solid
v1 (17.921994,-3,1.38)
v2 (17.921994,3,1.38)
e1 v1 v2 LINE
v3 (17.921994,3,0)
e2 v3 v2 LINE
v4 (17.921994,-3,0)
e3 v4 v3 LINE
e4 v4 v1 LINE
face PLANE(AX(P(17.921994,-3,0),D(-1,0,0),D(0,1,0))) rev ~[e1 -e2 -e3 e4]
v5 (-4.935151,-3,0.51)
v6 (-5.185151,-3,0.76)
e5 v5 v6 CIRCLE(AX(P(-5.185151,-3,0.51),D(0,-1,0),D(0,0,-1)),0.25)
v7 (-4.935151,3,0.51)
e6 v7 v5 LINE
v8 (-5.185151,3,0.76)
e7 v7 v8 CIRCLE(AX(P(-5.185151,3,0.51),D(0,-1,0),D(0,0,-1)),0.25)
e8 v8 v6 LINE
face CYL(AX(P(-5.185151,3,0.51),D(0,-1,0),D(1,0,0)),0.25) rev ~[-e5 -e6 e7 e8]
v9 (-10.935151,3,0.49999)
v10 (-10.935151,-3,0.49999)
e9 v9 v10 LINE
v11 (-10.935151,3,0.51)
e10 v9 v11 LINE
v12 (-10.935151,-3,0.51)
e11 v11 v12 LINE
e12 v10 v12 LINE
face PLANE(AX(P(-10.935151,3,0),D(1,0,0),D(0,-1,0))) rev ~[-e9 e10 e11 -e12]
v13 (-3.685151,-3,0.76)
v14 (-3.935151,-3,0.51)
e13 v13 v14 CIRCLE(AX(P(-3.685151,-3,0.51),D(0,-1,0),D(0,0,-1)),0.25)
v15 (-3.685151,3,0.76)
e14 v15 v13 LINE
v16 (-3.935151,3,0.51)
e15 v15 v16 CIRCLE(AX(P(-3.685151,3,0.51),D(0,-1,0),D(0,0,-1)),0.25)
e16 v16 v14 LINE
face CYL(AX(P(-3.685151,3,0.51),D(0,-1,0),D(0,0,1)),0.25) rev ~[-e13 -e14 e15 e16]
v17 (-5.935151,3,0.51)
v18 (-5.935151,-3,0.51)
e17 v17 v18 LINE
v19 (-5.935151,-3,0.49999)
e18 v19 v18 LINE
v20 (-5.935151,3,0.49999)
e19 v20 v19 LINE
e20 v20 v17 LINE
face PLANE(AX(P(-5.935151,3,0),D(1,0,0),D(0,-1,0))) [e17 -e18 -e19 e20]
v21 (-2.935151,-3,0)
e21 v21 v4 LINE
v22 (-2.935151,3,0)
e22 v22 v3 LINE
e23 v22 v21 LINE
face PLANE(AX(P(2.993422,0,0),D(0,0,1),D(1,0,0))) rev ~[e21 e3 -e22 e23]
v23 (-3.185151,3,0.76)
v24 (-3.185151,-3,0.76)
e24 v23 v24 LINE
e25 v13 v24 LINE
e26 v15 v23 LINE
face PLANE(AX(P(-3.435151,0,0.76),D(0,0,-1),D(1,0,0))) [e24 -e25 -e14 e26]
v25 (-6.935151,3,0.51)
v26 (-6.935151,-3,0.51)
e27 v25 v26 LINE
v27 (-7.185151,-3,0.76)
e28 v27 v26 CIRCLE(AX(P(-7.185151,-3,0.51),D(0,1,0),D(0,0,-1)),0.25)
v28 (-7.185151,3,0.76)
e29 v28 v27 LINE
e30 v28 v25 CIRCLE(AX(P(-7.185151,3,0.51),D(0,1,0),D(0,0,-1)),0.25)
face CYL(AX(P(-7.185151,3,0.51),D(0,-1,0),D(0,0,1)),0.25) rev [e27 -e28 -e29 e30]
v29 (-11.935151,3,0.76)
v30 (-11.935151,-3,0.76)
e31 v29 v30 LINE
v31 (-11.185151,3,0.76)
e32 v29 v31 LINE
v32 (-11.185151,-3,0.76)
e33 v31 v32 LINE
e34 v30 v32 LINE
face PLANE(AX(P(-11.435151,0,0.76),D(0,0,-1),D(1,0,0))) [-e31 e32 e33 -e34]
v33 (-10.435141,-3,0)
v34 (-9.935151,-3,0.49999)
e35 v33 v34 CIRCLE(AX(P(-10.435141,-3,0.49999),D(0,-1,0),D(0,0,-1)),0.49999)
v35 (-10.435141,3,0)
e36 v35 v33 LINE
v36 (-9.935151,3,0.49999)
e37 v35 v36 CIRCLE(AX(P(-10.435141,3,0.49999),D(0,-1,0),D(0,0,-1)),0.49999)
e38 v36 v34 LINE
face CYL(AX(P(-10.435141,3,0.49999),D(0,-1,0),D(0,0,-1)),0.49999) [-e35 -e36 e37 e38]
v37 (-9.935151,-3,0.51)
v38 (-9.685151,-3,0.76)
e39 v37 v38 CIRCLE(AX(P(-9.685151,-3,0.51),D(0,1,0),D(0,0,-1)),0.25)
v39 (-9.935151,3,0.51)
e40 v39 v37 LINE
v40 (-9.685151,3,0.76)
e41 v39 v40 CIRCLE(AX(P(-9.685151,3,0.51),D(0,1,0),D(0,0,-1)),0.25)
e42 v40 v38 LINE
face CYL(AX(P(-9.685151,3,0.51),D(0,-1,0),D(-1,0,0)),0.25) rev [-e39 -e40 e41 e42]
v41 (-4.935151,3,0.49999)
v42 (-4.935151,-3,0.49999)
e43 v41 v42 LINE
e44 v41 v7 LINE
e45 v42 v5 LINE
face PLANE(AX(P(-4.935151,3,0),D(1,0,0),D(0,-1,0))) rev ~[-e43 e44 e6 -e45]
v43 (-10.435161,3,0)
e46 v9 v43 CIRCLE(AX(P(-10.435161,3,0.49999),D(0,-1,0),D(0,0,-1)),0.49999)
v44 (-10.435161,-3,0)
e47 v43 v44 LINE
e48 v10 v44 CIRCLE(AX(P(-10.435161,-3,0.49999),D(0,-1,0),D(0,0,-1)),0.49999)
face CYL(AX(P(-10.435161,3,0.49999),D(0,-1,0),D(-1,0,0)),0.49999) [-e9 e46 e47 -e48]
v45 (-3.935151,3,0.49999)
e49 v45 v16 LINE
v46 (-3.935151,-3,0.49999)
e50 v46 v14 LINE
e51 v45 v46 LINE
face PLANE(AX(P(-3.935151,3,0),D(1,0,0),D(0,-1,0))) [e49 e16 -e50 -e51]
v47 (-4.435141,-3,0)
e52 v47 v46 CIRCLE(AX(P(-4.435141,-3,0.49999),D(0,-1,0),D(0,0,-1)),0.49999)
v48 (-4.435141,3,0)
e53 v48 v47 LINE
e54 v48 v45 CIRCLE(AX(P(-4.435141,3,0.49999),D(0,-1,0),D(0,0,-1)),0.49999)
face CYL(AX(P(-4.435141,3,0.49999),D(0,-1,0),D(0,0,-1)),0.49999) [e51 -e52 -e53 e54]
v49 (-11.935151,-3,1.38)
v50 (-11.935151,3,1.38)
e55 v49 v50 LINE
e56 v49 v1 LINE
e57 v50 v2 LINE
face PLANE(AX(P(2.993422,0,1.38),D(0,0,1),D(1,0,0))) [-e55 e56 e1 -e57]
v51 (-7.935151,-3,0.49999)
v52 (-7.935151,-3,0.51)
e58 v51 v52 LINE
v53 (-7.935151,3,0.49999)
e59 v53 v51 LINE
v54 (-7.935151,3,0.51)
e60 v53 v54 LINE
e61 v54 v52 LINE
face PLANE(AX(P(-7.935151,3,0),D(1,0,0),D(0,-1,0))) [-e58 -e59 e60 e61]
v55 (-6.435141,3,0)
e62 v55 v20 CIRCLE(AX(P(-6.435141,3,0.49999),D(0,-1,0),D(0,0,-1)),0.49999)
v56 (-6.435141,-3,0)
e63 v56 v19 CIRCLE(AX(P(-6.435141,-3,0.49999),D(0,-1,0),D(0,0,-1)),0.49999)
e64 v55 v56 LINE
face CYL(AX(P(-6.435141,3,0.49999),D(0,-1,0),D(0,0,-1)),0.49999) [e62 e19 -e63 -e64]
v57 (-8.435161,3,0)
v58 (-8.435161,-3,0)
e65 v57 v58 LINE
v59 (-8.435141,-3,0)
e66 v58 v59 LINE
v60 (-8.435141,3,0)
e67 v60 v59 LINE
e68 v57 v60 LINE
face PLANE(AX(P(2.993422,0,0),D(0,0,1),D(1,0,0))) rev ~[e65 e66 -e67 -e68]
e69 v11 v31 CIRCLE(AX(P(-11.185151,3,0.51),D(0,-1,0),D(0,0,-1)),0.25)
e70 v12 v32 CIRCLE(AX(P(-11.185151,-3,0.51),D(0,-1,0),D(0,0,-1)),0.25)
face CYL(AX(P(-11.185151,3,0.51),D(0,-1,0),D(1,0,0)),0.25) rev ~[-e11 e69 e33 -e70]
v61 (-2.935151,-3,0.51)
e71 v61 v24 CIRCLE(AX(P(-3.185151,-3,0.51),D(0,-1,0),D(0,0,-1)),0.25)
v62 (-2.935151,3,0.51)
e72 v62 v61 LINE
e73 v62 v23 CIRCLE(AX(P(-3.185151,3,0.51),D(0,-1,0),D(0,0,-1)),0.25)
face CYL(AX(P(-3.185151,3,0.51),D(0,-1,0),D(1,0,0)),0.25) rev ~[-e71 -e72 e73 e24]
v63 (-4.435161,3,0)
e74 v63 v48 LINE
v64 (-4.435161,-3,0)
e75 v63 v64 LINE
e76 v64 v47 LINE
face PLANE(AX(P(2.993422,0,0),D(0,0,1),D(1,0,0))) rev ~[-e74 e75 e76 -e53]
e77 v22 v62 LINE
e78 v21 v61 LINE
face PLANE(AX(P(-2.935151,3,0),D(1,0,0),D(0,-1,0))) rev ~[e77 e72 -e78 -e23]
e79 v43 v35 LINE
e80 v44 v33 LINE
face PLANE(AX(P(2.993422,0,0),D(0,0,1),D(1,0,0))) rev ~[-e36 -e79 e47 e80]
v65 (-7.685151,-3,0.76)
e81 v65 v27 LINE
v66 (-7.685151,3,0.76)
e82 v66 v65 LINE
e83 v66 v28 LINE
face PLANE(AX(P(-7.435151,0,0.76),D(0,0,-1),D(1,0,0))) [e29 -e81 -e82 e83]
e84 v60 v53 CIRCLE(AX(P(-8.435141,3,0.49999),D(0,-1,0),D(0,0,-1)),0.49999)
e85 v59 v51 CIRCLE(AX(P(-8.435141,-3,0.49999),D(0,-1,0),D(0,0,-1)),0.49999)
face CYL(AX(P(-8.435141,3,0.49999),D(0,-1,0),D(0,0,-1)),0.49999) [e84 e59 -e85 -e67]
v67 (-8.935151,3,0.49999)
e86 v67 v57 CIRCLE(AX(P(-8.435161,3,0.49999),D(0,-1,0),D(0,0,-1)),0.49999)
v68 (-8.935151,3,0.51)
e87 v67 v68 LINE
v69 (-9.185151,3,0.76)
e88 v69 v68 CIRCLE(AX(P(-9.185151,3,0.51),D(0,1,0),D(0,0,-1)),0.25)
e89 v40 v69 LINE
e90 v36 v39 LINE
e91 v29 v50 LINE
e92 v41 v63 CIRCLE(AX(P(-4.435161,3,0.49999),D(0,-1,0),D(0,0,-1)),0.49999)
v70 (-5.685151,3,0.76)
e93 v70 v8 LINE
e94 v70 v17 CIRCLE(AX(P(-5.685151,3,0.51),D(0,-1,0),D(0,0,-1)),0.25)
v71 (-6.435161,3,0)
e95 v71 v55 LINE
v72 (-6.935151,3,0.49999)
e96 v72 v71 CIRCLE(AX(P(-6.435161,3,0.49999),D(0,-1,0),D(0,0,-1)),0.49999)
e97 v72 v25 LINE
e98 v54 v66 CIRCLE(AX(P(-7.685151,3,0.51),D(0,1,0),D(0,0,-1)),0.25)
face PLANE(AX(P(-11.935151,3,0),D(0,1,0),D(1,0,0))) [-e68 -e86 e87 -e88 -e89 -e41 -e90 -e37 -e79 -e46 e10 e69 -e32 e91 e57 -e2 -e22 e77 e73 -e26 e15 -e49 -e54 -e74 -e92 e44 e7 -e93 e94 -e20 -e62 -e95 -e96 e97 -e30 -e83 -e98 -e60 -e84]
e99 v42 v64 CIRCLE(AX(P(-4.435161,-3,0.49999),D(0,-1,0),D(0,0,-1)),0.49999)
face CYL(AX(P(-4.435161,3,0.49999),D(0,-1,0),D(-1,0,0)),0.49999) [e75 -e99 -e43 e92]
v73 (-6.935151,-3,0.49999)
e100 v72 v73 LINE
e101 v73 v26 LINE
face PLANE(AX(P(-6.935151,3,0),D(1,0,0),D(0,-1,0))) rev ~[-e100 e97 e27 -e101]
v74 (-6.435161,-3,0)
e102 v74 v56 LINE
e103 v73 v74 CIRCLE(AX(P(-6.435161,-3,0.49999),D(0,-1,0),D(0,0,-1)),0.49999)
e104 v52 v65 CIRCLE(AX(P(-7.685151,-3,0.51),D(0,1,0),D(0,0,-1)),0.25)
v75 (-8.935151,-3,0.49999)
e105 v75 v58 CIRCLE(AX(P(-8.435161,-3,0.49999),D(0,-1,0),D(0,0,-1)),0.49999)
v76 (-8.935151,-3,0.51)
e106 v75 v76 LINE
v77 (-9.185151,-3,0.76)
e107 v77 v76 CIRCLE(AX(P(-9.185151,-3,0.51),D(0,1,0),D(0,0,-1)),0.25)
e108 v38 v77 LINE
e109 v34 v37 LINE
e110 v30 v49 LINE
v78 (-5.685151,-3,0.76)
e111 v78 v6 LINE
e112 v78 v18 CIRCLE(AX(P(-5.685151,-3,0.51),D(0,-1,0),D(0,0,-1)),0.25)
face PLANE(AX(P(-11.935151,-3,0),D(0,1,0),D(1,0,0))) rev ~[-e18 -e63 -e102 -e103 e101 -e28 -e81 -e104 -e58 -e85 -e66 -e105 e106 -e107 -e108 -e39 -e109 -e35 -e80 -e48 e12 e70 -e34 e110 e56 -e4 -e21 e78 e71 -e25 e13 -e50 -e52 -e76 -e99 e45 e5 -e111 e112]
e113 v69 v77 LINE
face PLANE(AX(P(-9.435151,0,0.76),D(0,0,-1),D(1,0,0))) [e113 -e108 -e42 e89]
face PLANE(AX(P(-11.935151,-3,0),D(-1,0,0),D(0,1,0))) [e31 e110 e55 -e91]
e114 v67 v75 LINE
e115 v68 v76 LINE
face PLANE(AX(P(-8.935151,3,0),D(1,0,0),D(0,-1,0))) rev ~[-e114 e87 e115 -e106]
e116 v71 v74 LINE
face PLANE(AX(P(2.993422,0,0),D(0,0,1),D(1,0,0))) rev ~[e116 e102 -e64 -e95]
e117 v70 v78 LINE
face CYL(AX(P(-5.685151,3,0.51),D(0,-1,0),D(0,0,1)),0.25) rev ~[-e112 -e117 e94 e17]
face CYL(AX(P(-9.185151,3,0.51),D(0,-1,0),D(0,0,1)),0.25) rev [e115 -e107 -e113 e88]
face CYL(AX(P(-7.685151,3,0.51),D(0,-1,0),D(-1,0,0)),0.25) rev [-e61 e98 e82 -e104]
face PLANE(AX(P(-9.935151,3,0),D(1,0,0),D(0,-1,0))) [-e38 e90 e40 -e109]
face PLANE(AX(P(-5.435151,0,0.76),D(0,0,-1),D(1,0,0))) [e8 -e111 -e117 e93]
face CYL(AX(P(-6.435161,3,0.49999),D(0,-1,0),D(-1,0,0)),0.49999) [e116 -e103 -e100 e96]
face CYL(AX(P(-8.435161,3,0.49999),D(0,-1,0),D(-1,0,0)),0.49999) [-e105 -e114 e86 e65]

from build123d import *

# Parameters (mm, degrees)
F0_W     = 29.8571444048
F0_H     = 6
F1_DEPTH = 1.38
F2_W     = 1
F2_H     = 6
F3_DEPTH = 0.76
F4_R     = 0.49999
F5_R     = 0.25


# Not quite as in the source:
# - a fillet or chamfer is up to 0.001 mm smaller than in the source, because OpenCascade refuses the exact size


with BuildPart() as f1:
    # F0 (on Top) → F1 (new body)
    with BuildSketch(Plane.XY):
        with Locations((2.9934216291, 0)):
            Rectangle(F0_W, F0_H)
    extrude(amount=F1_DEPTH)

    # F2 (on face) → F3 (cut)
    with BuildSketch(Plane(origin=(0, 0, 0), x_dir=(1, 0, 0), z_dir=(0, 0, -1))):
        with Locations((-11.4351505733, 0)):
            Rectangle(F2_W, F2_H)
        with Locations((-9.4351505733, 0)):
            Rectangle(F2_W, F2_H)
        with Locations((-7.4351505733, 0)):
            Rectangle(F2_W, F2_H)
        with Locations((-5.4351505733, 0)):
            Rectangle(F2_W, F2_H)
        with Locations((-3.4351505733, 0)):
            Rectangle(F2_W, F2_H)
    extrude(amount=-F3_DEPTH, mode=Mode.SUBTRACT)

    # F4 (radius 0.5 in the source; OpenCascade refuses exactly that, so slightly less here)
    f4_edges = [f1.edges().sort_by_distance(p)[0] for p in [
        (-10.935151, 0, 0),
        (-9.935151, 0, 0),
        (-8.935151, 0, 0),
        (-7.935151, 0, 0),
        (-6.935151, 0, 0),
        (-5.935151, 0, 0),
        (-4.935151, 0, 0),
        (-3.935151, 0, 0),
    ]]
    fillet(f4_edges, radius=F4_R)

    # F5
    f5_edges = [f1.edges().sort_by_distance(p)[0] for p in [
        (-10.935151, 0, 0.76),
        (-9.935151, 0, 0.76),
        (-8.935151, 0, 0.76),
        (-6.935151, 0, 0.76),
        (-4.935151, 0, 0.76),
        (-2.935151, 0, 0.76),
        (-3.935151, 0, 0.76),
        (-5.935151, 0, 0.76),
        (-7.935151, 0, 0.76),
    ]]
    fillet(f5_edges, radius=F5_R)


solid = f1.part
